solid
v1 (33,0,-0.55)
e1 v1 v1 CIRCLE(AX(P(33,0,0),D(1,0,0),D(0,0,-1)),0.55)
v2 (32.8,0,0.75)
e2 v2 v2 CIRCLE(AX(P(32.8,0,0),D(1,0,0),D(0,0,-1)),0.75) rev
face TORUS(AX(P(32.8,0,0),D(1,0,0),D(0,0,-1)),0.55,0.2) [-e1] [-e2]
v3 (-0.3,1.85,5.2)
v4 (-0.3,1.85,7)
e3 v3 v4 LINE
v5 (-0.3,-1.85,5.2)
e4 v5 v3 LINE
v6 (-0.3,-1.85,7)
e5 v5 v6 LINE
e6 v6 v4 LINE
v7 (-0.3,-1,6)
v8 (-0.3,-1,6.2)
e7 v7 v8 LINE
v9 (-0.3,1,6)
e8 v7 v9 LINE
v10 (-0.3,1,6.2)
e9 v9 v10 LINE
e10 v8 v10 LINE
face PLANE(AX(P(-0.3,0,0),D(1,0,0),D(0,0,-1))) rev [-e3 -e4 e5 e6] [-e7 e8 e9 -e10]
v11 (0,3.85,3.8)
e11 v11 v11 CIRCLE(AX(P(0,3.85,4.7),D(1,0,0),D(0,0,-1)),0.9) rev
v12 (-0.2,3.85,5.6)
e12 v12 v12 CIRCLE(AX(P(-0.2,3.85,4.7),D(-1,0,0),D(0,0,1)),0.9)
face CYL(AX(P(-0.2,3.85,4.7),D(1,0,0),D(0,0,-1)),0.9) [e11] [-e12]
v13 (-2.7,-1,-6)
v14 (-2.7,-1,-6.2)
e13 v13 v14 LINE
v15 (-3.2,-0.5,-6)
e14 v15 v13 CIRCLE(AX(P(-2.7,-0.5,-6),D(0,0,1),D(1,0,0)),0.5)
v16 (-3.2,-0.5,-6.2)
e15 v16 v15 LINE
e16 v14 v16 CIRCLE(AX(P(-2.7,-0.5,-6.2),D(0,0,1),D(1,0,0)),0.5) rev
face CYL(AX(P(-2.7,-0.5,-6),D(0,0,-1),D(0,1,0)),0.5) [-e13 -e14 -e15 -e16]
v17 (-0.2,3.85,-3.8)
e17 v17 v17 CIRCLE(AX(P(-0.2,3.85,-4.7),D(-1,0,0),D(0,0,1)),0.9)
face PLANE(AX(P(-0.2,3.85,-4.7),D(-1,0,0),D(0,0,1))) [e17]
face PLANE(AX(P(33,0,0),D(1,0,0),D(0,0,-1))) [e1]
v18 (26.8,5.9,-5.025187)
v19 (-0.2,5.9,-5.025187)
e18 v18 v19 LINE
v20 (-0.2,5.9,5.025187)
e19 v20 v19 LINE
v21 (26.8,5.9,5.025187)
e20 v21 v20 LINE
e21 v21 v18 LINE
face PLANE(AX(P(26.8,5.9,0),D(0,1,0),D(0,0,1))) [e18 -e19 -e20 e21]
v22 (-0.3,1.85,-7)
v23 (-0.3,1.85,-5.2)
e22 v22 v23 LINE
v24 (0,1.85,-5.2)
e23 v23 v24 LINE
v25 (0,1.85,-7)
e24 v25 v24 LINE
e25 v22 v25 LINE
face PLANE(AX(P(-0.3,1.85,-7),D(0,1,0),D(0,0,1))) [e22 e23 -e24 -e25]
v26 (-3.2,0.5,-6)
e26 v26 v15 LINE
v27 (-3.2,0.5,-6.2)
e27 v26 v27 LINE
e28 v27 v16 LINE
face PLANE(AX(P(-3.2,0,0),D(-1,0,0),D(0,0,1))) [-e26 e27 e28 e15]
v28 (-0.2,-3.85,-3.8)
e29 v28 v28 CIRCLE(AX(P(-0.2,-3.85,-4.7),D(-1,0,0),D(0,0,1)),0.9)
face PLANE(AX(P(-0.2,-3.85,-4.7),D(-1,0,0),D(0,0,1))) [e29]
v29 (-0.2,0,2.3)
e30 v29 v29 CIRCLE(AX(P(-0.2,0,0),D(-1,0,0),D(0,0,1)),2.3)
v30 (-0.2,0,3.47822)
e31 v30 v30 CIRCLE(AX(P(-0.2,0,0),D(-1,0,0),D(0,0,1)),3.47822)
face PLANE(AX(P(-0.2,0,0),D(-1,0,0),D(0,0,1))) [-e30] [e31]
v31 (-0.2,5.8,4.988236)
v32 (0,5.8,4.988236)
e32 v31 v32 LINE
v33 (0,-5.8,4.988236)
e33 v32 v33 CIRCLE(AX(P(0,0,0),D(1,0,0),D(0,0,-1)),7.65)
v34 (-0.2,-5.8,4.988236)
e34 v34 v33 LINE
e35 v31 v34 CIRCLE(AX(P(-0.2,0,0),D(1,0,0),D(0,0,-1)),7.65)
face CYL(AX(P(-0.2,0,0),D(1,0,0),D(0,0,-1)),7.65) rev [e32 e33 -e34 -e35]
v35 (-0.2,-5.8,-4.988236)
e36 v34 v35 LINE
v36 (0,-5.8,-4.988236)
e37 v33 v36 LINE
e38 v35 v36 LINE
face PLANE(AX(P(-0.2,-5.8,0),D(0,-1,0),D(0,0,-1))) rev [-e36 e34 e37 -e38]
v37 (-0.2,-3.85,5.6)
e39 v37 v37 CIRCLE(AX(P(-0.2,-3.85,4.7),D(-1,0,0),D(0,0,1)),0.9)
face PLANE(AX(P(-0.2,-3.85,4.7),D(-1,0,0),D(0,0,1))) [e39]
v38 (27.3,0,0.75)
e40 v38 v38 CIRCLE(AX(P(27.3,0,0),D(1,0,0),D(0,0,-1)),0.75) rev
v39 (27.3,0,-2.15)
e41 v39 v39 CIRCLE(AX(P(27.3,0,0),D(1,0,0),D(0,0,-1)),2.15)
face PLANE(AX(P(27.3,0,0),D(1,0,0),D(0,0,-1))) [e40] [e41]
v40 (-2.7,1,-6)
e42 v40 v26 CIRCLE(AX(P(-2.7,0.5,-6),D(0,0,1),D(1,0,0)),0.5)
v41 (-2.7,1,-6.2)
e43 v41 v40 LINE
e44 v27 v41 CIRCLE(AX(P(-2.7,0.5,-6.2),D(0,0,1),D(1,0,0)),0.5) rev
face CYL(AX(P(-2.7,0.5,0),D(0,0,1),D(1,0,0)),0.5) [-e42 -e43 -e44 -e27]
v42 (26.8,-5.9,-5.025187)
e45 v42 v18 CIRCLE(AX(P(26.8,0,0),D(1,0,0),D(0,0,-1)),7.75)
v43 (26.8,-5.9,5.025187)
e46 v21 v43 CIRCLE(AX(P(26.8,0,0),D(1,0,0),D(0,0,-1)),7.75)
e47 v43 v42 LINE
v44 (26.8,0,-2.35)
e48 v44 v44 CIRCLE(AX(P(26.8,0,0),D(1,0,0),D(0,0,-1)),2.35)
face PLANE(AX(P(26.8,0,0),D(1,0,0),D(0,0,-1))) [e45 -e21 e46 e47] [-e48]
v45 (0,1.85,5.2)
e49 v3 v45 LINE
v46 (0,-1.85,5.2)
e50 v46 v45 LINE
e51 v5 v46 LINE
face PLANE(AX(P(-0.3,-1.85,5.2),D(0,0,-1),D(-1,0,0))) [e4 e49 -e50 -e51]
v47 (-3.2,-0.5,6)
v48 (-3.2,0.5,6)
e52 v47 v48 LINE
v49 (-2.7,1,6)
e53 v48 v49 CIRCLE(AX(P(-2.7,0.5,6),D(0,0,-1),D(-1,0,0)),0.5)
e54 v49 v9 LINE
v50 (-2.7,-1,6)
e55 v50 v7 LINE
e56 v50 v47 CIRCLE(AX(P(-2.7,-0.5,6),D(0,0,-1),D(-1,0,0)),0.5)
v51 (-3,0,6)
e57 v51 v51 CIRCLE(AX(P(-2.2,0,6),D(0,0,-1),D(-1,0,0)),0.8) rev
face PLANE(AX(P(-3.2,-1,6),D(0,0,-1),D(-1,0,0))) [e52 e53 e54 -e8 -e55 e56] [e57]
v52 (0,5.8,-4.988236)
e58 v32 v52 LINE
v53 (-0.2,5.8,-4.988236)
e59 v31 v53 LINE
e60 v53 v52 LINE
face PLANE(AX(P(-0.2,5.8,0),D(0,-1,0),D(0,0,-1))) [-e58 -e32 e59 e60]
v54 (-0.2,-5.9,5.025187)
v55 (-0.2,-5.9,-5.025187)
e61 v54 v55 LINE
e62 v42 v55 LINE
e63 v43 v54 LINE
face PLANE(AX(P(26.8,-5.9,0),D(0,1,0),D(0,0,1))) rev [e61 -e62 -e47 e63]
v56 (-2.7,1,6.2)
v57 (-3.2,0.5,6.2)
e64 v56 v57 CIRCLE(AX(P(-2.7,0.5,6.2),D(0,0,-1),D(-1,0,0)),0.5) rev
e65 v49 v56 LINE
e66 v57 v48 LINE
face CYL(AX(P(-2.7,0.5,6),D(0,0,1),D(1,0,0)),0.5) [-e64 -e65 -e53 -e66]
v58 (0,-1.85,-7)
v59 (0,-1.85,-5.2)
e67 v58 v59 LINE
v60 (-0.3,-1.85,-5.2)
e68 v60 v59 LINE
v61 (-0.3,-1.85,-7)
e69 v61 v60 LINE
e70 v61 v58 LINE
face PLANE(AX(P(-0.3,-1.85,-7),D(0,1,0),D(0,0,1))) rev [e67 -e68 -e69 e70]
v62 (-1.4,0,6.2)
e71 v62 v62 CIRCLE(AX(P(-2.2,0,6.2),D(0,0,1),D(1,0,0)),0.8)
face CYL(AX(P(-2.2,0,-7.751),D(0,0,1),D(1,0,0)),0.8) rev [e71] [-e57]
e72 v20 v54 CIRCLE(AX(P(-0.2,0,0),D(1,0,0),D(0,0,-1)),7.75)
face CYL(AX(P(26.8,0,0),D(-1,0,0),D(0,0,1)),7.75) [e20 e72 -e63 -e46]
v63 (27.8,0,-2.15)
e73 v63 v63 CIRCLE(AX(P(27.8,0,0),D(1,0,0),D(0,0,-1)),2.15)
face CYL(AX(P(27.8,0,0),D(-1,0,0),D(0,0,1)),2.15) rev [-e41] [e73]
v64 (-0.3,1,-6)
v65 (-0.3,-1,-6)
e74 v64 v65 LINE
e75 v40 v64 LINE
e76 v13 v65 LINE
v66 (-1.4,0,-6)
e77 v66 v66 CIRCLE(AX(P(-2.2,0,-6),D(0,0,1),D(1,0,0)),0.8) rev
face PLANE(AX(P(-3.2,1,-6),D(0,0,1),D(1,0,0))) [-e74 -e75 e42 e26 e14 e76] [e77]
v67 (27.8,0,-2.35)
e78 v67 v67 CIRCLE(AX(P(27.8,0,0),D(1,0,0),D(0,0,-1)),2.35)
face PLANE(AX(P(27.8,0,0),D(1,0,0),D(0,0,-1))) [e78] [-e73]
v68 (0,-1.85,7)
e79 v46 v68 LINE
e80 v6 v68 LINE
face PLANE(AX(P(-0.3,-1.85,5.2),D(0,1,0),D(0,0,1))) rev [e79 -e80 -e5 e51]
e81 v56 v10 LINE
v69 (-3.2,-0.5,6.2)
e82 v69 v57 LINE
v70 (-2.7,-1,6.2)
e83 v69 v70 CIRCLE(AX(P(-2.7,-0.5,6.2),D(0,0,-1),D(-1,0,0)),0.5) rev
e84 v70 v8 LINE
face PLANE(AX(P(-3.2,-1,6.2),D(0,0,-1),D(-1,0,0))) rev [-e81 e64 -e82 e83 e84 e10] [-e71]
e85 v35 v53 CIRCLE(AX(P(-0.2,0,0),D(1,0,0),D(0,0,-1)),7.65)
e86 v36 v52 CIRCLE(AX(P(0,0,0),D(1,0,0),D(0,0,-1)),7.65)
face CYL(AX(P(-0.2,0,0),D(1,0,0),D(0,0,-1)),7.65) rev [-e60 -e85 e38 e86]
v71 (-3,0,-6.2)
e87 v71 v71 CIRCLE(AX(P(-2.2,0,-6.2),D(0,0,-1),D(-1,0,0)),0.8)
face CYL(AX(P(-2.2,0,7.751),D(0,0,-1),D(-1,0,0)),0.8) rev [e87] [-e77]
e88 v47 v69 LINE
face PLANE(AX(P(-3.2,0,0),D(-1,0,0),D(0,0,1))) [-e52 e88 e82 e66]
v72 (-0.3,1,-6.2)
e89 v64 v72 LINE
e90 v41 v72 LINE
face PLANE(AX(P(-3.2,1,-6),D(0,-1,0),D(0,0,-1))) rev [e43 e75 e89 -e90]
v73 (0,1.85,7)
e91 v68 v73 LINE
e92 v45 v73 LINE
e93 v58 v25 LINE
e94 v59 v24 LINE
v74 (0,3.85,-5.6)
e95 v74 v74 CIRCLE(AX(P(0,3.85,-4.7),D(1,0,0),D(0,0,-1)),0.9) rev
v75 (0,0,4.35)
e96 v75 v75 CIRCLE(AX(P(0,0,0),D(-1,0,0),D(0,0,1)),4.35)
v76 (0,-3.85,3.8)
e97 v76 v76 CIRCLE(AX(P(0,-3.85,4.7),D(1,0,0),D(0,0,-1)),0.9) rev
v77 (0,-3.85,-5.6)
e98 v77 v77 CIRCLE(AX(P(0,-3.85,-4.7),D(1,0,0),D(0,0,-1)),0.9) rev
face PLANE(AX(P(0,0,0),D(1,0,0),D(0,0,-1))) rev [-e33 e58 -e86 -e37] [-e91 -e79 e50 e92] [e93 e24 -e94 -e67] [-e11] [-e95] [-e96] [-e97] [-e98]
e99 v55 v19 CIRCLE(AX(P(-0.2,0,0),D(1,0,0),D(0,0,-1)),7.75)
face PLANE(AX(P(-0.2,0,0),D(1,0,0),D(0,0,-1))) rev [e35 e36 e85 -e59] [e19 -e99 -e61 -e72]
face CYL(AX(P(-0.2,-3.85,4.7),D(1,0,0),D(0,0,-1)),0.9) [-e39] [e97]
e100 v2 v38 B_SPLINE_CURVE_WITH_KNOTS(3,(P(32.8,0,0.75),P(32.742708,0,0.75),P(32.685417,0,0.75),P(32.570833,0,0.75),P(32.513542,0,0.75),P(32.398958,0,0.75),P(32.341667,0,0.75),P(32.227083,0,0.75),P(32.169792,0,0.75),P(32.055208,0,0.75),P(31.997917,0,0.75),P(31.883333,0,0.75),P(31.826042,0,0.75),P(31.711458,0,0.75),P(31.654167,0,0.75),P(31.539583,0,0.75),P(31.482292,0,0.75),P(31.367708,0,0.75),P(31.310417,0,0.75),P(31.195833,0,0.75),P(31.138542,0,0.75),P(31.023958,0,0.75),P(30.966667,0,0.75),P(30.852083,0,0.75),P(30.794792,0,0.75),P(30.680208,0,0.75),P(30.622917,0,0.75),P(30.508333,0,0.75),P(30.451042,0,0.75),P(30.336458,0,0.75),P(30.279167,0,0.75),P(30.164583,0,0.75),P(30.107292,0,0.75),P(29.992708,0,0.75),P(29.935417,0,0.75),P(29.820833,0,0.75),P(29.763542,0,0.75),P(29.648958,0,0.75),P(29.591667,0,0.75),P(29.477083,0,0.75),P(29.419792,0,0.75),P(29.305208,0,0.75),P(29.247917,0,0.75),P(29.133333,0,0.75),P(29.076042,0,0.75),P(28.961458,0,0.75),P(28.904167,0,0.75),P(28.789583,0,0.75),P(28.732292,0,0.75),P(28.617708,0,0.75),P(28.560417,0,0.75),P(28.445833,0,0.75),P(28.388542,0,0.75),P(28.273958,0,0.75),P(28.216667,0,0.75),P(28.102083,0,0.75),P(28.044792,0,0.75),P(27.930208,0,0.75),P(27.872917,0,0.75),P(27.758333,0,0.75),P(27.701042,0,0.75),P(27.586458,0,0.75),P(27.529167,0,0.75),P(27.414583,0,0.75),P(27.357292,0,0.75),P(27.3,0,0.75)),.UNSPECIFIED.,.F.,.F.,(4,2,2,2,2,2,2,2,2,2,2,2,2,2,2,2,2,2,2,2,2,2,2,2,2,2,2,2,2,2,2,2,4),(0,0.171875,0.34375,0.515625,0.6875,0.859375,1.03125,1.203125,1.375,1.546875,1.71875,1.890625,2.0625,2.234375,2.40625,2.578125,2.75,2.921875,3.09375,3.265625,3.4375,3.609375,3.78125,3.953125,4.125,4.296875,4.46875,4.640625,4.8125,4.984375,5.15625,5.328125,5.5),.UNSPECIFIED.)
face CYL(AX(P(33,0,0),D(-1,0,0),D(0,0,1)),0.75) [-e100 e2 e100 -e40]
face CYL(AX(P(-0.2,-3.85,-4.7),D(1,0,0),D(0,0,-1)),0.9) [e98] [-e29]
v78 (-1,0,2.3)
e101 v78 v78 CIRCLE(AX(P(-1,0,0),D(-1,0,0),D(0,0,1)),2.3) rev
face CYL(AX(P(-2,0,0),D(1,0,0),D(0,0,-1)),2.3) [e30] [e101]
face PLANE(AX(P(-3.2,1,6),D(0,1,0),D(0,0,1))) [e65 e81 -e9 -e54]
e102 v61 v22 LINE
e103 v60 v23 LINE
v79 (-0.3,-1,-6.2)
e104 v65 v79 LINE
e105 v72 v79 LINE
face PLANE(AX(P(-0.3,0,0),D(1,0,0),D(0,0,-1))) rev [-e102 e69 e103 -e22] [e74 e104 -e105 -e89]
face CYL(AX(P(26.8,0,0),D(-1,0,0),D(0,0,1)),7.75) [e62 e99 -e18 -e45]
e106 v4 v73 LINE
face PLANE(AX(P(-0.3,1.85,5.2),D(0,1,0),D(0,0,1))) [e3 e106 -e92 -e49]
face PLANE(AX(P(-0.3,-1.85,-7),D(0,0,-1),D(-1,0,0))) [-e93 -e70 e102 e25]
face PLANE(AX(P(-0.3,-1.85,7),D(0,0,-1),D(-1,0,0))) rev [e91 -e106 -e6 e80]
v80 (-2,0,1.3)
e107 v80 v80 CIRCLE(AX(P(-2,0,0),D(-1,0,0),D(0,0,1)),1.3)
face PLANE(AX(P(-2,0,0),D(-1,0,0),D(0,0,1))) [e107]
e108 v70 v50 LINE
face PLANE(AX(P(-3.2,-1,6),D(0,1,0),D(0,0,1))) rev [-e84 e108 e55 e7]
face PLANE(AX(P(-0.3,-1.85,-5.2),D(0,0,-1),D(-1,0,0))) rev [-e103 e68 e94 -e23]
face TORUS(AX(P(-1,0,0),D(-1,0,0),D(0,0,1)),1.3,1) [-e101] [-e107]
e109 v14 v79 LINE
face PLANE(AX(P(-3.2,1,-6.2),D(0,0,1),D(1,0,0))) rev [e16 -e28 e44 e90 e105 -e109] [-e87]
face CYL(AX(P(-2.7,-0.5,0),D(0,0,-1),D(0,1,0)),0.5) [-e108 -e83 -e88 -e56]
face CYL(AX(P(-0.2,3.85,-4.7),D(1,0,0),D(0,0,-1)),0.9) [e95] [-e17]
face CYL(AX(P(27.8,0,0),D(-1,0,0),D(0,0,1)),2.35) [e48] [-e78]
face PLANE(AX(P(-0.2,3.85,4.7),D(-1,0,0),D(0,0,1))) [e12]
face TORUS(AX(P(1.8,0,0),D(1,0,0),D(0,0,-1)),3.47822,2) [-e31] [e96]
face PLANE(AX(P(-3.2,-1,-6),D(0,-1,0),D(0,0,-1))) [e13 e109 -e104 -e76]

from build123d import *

# Parameters (mm, degrees)
EXTRUDE_1_DEPTH     = 26.8
EXTRUDE_START       = -0.2
EXTRUDE_1_2_DEPTH   = 0.2
SKETCH_2_R          = 4.35
EXTRUDE_2_DEPTH     = 0.2
FILLET_1_R          = 2
SKETCH_3_R          = 2.3
EXTRUDE_3_DEPTH     = 1.8
FILLET_2_R          = 1
SKETCH_4_W          = 1.8
SKETCH_4_H          = 3.7
EXTRUDE_8_DEPTH     = 0.3
SKETCH_4_4_W        = 0.2
SKETCH_4_4_H        = 2
EXTRUDE_9_DEPTH     = 3.2
CUT_EXTRUDE_1_REACH = 32.784
SKETCH_5_R          = 0.8
CUT_EXTRUDE_2_REACH = 32.784
SKETCH_6_R          = 0.8
FILLET_3_R          = 0.5
SKETCH_7_R          = 0.9
EXTRUDE_10_DEPTH    = 0.2
SKETCH_8_R          = 2.35
SKETCH_8_R_2        = 2.15
EXTRUDE_2_2_DEPTH   = 1
SKETCH_8_2_R        = 2.35
EXTRUDE_11_DEPTH    = 0.5
SKETCH_9_R          = 0.75
EXTRUDE_12_DEPTH    = 6.2
FILLET_4_R          = 0.2


# Read off the part's stored shape, not the designer's step: 拉伸-薄壁1
with BuildPart() as part:
    # 草图1 → Extrude 1 (new body)
    with BuildSketch(Plane(origin=(0, 0, 0), x_dir=(0, 0, -1), z_dir=(1, 0, 0))):
        with BuildLine():
            ThreePointArc((-7.75, 0), (-7.035897095, -3.249407956), (-5.025186564, -5.9))
            Line((-5.025186564, -5.9), (5.025186564, -5.9))
            ThreePointArc((5.025186564, -5.9), (7.035897095, -3.249407956), (7.75, 0))
            ThreePointArc((7.75, 0), (7.035897095, 3.249407956), (5.025186564, 5.9))
            Line((5.025186564, 5.9), (-5.025186564, 5.9))
            ThreePointArc((-5.025186564, 5.9), (-7.035897095, 3.249407956), (-7.75, 0))
        make_face()
    extrude(amount=EXTRUDE_1_DEPTH)



with BuildPart() as body_2:
    # Extrude 1 2 outline → Extrude 1 2 (new body)
    with BuildSketch(Plane(origin=(0, 0, 0), x_dir=(0, 0, -1), z_dir=(1, 0, 0)).offset(EXTRUDE_START)):
        with BuildLine():
            Line((5.025186564, 5.9), (-5.025186564, 5.9))
            ThreePointArc((-5.025186564, 5.9), (-7.75, 0), (-5.025186564, -5.9))
            Line((-5.025186564, -5.9), (5.025186564, -5.9))
            ThreePointArc((5.025186564, -5.9), (7.75, 0), (5.025186564, 5.9))
        make_face()
        with BuildLine():
            ThreePointArc((-4.988236161, -5.8), (-7.65, 0), (-4.988236161, 5.8))
            Line((-4.988236161, 5.8), (4.988236161, 5.8))
            ThreePointArc((4.988236161, 5.8), (7.65, 0), (4.988236161, -5.8))
            Line((4.988236161, -5.8), (-4.988236161, -5.8))
        make_face(mode=Mode.SUBTRACT)
    extrude(amount=EXTRUDE_1_2_DEPTH)


with BuildPart() as part_1:
    add(part.part)

    add(body_2.part)  # Extrude 2 merges body 2
    # 草图2 → Extrude 2 (add)
    with BuildSketch(Plane.ZY):
        Circle(SKETCH_2_R)
    extrude(amount=EXTRUDE_2_DEPTH)

    # 圆角1
    # the kernel refuses this fillet: 2 mm, written as the material it takes off along each edge
    with BuildSketch(Plane(origin=(-0.2, 0, 0), x_dir=(0, 0, 1), z_dir=(0, -1, 0))) as fillet_1_piece_1:
        with BuildLine():
            CenterArc((3.478220211, -2), FILLET_1_R, 64.158067237, 25.841932763)
            Line((3.478220211, 0), (3.478220211, 0.04))
            Line((3.478220211, 0.04), (4.35, 0.04))
            Line((4.35, 0.04), (4.39, 0))
            ThreePointArc((4.39, 0), (4.39, -0.1), (4.367435596, -0.164))
            Line((4.367435596, -0.164), (4.35, -0.2))
        make_face()
    revolve(axis=Axis((-0.2, 0, 0), (-1, 0, 0)), mode=Mode.SUBTRACT)

    # 草图3 → 凸台-拉伸3 (add)
    with BuildSketch(Plane.ZY.offset(0.2)):
        Circle(SKETCH_3_R)
    extrude(amount=EXTRUDE_3_DEPTH)

    # 圆角2
    fillet_2_edges = [part_1.edges().sort_by_distance(p)[0] for p in [
        (-2, 0, -2.3),
    ]]
    fillet(fillet_2_edges, radius=FILLET_2_R)

    # 草图4 → 凸台-拉伸8 (add)
    with BuildSketch(Plane.ZY):
        with Locations((-6.1, 0)):
            Rectangle(SKETCH_4_W, SKETCH_4_H)
        with Locations((6.1, 0)):
            Rectangle(SKETCH_4_W, SKETCH_4_H)
    extrude(amount=EXTRUDE_8_DEPTH)

    # 草图4<4> → 凸台-拉伸9 (add)
    with BuildSketch(Plane.ZY):
        with Locations((6.1, 0)):
            Rectangle(SKETCH_4_4_W, SKETCH_4_4_H)
        with Locations((-6.1, 0)):
            Rectangle(SKETCH_4_4_W, SKETCH_4_4_H)
    extrude(amount=EXTRUDE_9_DEPTH)

    # 草图5 → 切除-拉伸1 (cut, up to next)
    with BuildSketch(Plane(origin=(0, 0, -6.2), x_dir=(-1, 0, 0), z_dir=(0, 0, -1)), mode=Mode.PRIVATE) as cut_extrude_1_sk1:
        with Locations((2.2, 0)):
            Circle(SKETCH_5_R)
    cut_extrude_1_tool1 = extrude(cut_extrude_1_sk1.sketch, amount=-CUT_EXTRUDE_1_REACH, mode=Mode.PRIVATE) & part_1.part
    add(cut_extrude_1_tool1.solids().sort_by_distance((-2.2, 0, -6.2))[0], mode=Mode.SUBTRACT)

    # 草图6 → 切除-拉伸2 (cut, up to next)
    with BuildSketch(Plane.XY.offset(6.2), mode=Mode.PRIVATE) as cut_extrude_2_sk1:
        with Locations(Location((-2.2, 0, 0), (0, 0, 180))):
            Circle(SKETCH_6_R)
    cut_extrude_2_tool1 = extrude(cut_extrude_2_sk1.sketch, amount=-CUT_EXTRUDE_2_REACH, mode=Mode.PRIVATE) & part_1.part
    add(cut_extrude_2_tool1.solids().sort_by_distance((-2.2, 0, 6.2))[0], mode=Mode.SUBTRACT)

    # 圆角3
    fillet_3_edges = [part_1.edges().sort_by_distance(p)[0] for p in [
        (-3.2, -1, -6.1),
        (-3.2, 1, -6.1),
        (-3.2, 1, 6.1),
        (-3.2, -1, 6.1),
    ]]
    fillet(fillet_3_edges, radius=FILLET_3_R)

    # 草图7 → 凸台-拉伸10 (add)
    with BuildSketch(Plane.ZY):
        with Locations(Location((-4.7, 3.85, 0), (0, 0, 180))):
            Circle(SKETCH_7_R)
        with Locations(Location((4.7, 3.85, 0), (0, 0, 180))):
            Circle(SKETCH_7_R)
        with Locations(Location((4.7, -3.85, 0), (0, 0, 180))):
            Circle(SKETCH_7_R)
        with Locations(Location((-4.7, -3.85, 0), (0, 0, 180))):
            Circle(SKETCH_7_R)
    extrude(amount=EXTRUDE_10_DEPTH)

    # 草图8 → Extrude 2 2 (add)
    with BuildSketch(Plane(origin=(26.8, 0, 0), x_dir=(0, 0, -1), z_dir=(1, 0, 0))):
        Circle(SKETCH_8_R)
        Circle(SKETCH_8_R_2, mode=Mode.SUBTRACT)
    extrude(amount=EXTRUDE_2_2_DEPTH)

    # 草图8<2> → 凸台-拉伸11 (add)
    with BuildSketch(Plane(origin=(26.8, 0, 0), x_dir=(0, 0, -1), z_dir=(1, 0, 0))):
        Circle(SKETCH_8_2_R)
    extrude(amount=EXTRUDE_11_DEPTH)

    # 草图9 → 凸台-拉伸12 (add)
    with BuildSketch(Plane(origin=(26.8, 0, 0), x_dir=(0, 0, -1), z_dir=(1, 0, 0))):
        with Locations(Location((0, 0, 0), (0, 0, 180))):
            Circle(SKETCH_9_R)
    extrude(amount=EXTRUDE_12_DEPTH)

    # 圆角4
    fillet_4_edges = [part_1.edges().sort_by_distance(p)[0] for p in [
        (33, 0, -0.75),
    ]]
    fillet(fillet_4_edges, radius=FILLET_4_R)


solid = part_1.part
